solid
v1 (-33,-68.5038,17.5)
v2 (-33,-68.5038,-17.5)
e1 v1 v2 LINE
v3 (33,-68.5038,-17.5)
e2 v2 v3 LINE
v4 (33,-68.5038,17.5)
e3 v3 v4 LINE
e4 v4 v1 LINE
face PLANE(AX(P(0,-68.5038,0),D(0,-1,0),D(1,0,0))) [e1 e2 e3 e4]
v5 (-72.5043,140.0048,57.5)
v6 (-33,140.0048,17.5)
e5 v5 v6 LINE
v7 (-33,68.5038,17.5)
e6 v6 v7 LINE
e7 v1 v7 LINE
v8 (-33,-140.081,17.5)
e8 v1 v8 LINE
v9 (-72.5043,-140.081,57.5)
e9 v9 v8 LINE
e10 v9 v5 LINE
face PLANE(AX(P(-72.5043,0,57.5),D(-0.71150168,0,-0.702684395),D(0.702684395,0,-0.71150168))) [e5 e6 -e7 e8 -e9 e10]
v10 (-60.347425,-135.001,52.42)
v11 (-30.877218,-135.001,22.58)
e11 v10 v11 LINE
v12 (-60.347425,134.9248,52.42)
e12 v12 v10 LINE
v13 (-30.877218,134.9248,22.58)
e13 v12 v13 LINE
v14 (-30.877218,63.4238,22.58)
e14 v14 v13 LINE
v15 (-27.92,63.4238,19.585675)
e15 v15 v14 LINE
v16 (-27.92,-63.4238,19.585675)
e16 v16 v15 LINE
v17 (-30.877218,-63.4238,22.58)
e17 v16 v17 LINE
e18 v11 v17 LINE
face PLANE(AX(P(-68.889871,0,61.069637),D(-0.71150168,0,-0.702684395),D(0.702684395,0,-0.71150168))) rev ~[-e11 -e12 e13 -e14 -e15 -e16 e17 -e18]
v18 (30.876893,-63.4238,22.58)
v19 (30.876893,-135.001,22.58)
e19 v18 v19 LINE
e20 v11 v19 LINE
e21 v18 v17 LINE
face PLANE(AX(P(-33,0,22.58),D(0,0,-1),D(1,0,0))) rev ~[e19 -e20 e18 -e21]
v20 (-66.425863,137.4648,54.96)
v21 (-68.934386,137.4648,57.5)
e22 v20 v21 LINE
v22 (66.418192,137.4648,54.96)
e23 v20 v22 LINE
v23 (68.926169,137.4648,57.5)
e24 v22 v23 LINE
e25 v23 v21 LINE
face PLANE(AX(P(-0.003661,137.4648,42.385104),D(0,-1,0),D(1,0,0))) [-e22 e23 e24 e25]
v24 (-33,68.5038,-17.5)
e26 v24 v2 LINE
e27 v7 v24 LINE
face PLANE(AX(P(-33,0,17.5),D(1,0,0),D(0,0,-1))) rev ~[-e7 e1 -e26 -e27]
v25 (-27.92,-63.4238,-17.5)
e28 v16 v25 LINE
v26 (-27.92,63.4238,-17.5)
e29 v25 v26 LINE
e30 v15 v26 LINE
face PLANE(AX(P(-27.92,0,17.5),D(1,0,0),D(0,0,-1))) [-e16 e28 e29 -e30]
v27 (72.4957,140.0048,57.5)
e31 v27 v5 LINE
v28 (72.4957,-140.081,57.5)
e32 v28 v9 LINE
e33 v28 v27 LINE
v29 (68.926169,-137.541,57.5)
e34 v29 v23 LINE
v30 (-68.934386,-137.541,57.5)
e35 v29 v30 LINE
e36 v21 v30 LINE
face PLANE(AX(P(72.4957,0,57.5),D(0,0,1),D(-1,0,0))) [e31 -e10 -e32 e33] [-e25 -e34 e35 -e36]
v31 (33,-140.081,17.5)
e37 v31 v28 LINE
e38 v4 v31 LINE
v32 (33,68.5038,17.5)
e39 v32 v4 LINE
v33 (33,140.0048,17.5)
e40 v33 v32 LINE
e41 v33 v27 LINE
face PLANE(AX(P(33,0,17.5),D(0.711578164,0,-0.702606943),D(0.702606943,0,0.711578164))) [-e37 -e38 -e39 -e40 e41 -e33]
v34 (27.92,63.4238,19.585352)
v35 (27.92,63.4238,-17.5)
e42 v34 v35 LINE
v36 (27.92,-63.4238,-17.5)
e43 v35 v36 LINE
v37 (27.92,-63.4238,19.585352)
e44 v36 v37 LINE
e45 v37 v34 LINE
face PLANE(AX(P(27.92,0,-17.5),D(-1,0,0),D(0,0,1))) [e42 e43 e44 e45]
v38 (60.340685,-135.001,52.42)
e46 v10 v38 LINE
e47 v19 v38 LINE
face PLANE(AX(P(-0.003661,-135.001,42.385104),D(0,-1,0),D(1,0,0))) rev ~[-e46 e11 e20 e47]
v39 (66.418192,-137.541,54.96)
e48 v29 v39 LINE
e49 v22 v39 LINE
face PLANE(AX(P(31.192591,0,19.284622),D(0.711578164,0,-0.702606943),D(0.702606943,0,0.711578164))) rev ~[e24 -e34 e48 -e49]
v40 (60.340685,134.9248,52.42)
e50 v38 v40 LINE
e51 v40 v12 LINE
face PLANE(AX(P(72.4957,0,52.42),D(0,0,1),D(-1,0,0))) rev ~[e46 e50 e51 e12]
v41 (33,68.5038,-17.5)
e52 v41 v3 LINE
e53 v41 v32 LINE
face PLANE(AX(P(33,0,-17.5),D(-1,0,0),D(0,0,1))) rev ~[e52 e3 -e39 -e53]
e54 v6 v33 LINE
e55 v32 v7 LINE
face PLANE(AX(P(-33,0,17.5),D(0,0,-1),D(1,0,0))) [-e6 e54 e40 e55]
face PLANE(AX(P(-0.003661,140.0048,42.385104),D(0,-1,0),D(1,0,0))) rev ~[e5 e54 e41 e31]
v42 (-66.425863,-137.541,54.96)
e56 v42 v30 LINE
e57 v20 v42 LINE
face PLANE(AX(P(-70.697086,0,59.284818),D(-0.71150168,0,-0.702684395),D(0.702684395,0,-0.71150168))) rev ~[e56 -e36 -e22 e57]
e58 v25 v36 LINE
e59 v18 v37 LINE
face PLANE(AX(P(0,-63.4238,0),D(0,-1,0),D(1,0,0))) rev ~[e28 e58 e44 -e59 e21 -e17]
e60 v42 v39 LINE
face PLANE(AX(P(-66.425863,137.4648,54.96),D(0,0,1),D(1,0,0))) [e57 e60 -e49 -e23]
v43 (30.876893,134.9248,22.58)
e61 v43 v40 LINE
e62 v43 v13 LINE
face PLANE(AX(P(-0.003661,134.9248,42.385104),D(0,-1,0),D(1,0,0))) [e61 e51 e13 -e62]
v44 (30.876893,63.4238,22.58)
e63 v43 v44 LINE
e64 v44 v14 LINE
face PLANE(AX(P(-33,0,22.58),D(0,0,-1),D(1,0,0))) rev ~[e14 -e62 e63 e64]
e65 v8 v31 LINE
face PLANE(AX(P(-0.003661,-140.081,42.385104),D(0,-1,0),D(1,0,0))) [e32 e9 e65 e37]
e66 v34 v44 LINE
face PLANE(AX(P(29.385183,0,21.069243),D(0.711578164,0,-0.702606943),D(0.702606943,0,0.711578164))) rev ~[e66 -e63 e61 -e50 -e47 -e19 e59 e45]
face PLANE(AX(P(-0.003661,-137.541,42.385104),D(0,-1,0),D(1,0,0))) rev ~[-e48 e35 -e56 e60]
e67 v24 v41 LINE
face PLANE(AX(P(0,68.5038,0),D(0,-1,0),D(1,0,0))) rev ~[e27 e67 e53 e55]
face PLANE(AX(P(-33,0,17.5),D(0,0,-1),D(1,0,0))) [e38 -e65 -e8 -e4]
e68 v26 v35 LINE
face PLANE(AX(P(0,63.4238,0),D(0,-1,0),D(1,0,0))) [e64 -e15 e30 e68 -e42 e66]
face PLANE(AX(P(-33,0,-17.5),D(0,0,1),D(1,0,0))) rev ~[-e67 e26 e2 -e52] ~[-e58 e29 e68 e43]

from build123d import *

# Parameters (mm, degrees)
F1_DEPTH     = 140.081
F2_DEPTH     = 140.0048
F3_DEPTH     = 68.5038
F4_DEPTH     = 68.5038
F5_T         = -5.08
F6_T         = 2.54
F6_T3_DEPTH  = 142.0876
F6_T5_DEPTH  = 71.08
F6_T7_DEPTH  = 275.0058
F6_T9_DEPTH  = 47.0194652776
F6_T11_DEPTH = 76.581
F6_T13_DEPTH = 9.2884577092
F6_T15_DEPTH = 76.6572
F6_T17_DEPTH = 125.7681103512
F6_T19_DEPTH = 47.0149573841
F6_T21_DEPTH = 66.8341103512
F6_T23_DEPTH = 47.0149573841
F6_T25_DEPTH = 9.2884593969
F6_T27_DEPTH = 42.1653521873
F6_T29_DEPTH = 42.16567527


# Not quite as in the source:
# - a shell that OpenCascade refuses in one call is made with other operations: the cavity is built on its own and cut out


with BuildPart() as f1:
    # F0 (on Front) → F1 (new body)
    with BuildSketch(Plane.XZ):
        Polygon((-72.5043, 57.5), (-33, 17.5), (0, 17.5), (33, 17.5), (72.4957, 57.5), align=None)
    extrude(amount=F1_DEPTH)

    # F0 (on Front) → F2 (join)
    with BuildSketch(Plane.XZ):
        Polygon((-72.5043, 57.5), (-33, 17.5), (0, 17.5), (33, 17.5), (72.4957, 57.5), align=None)
    extrude(amount=-F2_DEPTH)

    # F0 (on Front) → F3 (join)
    with BuildSketch(Plane.XZ):
        Polygon((-33, 17.5), (-33, -17.5), (33, -17.5), (33, 17.5), (0, 17.5), align=None)
    extrude(amount=-F3_DEPTH)

    # F0 (on Front) → F4 (join)
    with BuildSketch(Plane.XZ):
        Polygon((-33, 17.5), (-33, -17.5), (33, -17.5), (33, 17.5), (0, 17.5), align=None)
    extrude(amount=F4_DEPTH)

    # F5
    f5_openings = [f1.faces().sort_by_distance(p)[0] for p in [
        (0, 0, -17.5),
    ]]
    offset(amount=F5_T, openings=f5_openings, kind=Kind.INTERSECTION)

    # F6: shell of thickness 2.54, made by hand


with BuildPart() as f6_core1:
    # F6_t2: copy of F1
    add(f1.part)

    # the walls: a layer under each face that stays
    f6_faces = [f6_core1.faces().sort_by_distance(p)[0] for p in [
        (-52.75215, -0.0381, 37.5),
        (-0.0043, 140.0048, 37.5),
        (52.74785, -0.0381, 37.5),
        (33, 0, 0),
        (0, -68.5038, 0),
        (0, 68.5038, 0),
        (0, 104.2543, 17.5),
        (-33, 0, 0),
        (0, -104.2924, 17.5),
        (-0.0043, -140.081, 37.5),
        (-28.2857142857, 58.7175428571, -17.5),
        (-44.1337126804, -0.0381, 36.002837635),
        (-0.0033701852, 134.9248, 37.5),
        (44.1303424952, -0.0381, 36.0026760937),
        (27.92, 0, 1.0426760937),
        (28.4128154651, -63.4238, 21.0826760937),
        (0, -63.4238, 2.54),
        (-29.3986087804, -63.4238, 22.0809458783),
        (28.4128154651, 63.4238, 21.0826760937),
        (0, 63.4238, 2.54),
        (-29.3986087804, 63.4238, 22.0809458783),
        (-0.0001623852, 99.1743, 22.58),
        (-27.92, 0, 1.042837635),
        (-0.0001623852, -99.2124, 22.58),
        (-0.0033701852, -135.001, 37.5),
        (-0.0033701852, -0.0381, 52.42),
    ]]
    thicken(f6_faces, amount=-F6_T, mode=Mode.SUBTRACT)

    # F6_s4 → F6_t3 (cut)
    with BuildSketch(Plane.XZ.offset(-71.0438)):
        Polygon((-33.0434721427, 17.4821518164), (-31.192785733, 19.2848183642), (-30.46, 18.542837635), (-30.46, 17.5), align=None)
        Polygon((33.0434740854, 17.4821537837), (31.1925914624, 19.2846216345), (30.46, 18.5426760937), (30.46, 17.5), align=None)
    extrude(amount=F6_T3_DEPTH, mode=Mode.SUBTRACT)

    # F6_s6 → F6_t5 (cut)
    with BuildSketch(Plane.YZ.offset(-35.54)):
        Polygon((-68.5292, 17.4746), (-65.9638, 17.5), (-65.9638, 20.04), (-68.5038, 20.04), align=None)
        Polygon((68.5292, 17.4746), (65.9638, 17.5), (65.9638, 20.04), (68.5038, 20.04), align=None)
    extrude(amount=F6_T5_DEPTH, mode=Mode.SUBTRACT)

    # F6_s8 → F6_t7 (cut)
    with BuildSketch(Plane.XZ.offset(-137.4648)):
        Polygon((-60.3293532181, 52.4124481836), (-62.1546396278, 50.6351816358), (-66.4258626804, 54.96), (-60.3474253608, 54.96), align=None)
        Polygon((60.322610905, 52.4124462163), (62.148093528, 50.6353783655), (66.4181924952, 54.96), (60.3406849904, 54.96), align=None)
    extrude(amount=F6_T7_DEPTH, mode=Mode.SUBTRACT)

    # F6_s10 → F6_t9 (cut)
    with BuildSketch(Plane(origin=(-57.7902488571, 0, 58.5154009635), x_dir=(0, 1, 0), z_dir=(0.7026843954, 0, -0.7115016799))):
        Polygon((134.8994, -6.0771785187), (134.9248, -8.6425785187), (137.4648, -8.6425785187), (137.4648, -6.1025785187), align=None)
        Polygon((-134.9756, -6.0771785187), (-135.001, -8.6425785187), (-137.541, -8.6425785187), (-137.541, -6.1025785187), align=None)
    extrude(amount=F6_T9_DEPTH, mode=Mode.SUBTRACT)

    # F6_s12 → F6_t11 (cut)
    with BuildSketch(Plane.XZ.offset(-137.4648)):
        Polygon((-30.8591454181, 22.6232481836), (-32.6844318278, 20.7951816358), (-31.9386087804, 20.04), (-30.8772175608, 20.04), align=None)
        Polygon((30.858818705, 22.6232462163), (32.684301328, 20.7953783655), (31.9384463952, 20.04), (30.8768927904, 20.04), align=None)
    extrude(amount=F6_T11_DEPTH, mode=Mode.SUBTRACT)

    # F6_s14 → F6_t13 (cut)
    with BuildSketch(Plane(origin=(-28.3200410571, 0, 28.6754009635), x_dir=(0, 1, 0), z_dir=(0.7026843954, 0, -0.7115016799))):
        Polygon((63.3984, -6.0771785187), (63.4238, -8.6425785187), (65.9638, -8.6425785187), (65.9638, -6.1025785187), align=None)
        Polygon((-63.3984, -6.0771785187), (-63.4238, -8.6425785187), (-65.9638, -8.6425785187), (-65.9638, -6.1025785187), align=None)
    extrude(amount=F6_T13_DEPTH, mode=Mode.SUBTRACT)

    # F6_s16 → F6_t15 (cut)
    with BuildSketch(Plane.XZ.offset(60.8838)):
        Polygon((-30.8591454181, 22.6232481836), (-32.6844318278, 20.7951816358), (-31.9386087804, 20.04), (-30.8772175608, 20.04), align=None)
        Polygon((30.858818705, 22.6232462163), (32.684301328, 20.7953783655), (31.9384463952, 20.04), (30.8768927904, 20.04), align=None)
    extrude(amount=F6_T15_DEPTH, mode=Mode.SUBTRACT)

    # F6_s18 → F6_t17 (cut)
    with BuildSketch(Plane.YZ.offset(-62.8874253608)):
        Polygon((134.8994, 52.3946), (137.4648, 52.42), (137.4648, 54.96), (134.9248, 54.96), align=None)
        Polygon((-134.9756, 52.3946), (-137.541, 52.42), (-137.541, 54.96), (-135.001, 54.96), align=None)
    extrude(amount=F6_T17_DEPTH, mode=Mode.SUBTRACT)

    # F6_s20 → F6_t19 (cut)
    with BuildSketch(Plane(origin=(57.7800845012, 0, 58.5178482733), x_dir=(0, 1, 0), z_dir=(-0.7026069427, 0, -0.7115781644))):
        Polygon((134.8994, 6.0810579283), (137.4648, 6.1064579283), (137.4648, 8.6464579283), (134.9248, 8.6464579283), align=None)
    extrude(amount=F6_T19_DEPTH, mode=Mode.SUBTRACT)

    # F6_s22 → F6_t21 (cut)
    with BuildSketch(Plane.YZ.offset(-33.4172175608)):
        Polygon((134.8994, 22.6054), (137.4648, 22.58), (137.4648, 20.04), (134.9248, 20.04), align=None)
        Polygon((-134.9756, 22.6054), (-135.001, 20.04), (-137.541, 20.04), (-137.541, 22.58), align=None)
    extrude(amount=F6_T21_DEPTH, mode=Mode.SUBTRACT)

    # F6_s24 → F6_t23 (cut)
    with BuildSketch(Plane(origin=(24.7470490323, 0, 25.0630311981), x_dir=(0, 1, 0), z_dir=(0.7026069427, 0, 0.7115781644))):
        Polygon((-134.9756, -6.0810579283), (-135.001, -8.6464579283), (-137.541, -8.6464579283), (-137.541, -6.1064579283), align=None)
    extrude(amount=F6_T23_DEPTH, mode=Mode.SUBTRACT)

    # F6_s26 → F6_t25 (cut)
    with BuildSketch(Plane(origin=(21.7901562419, 0, 22.0683833854), x_dir=(0, 1, 0), z_dir=(0.7026069427, 0, 0.7115781644))):
        Polygon((-63.3984, -6.0810579283), (-63.4238, -8.6464579283), (-65.9638, -8.6464579283), (-65.9638, -6.1064579283), align=None)
        Polygon((63.3984, -6.0810579283), (63.4238, -8.6464579283), (65.9638, -8.6464579283), (65.9638, -6.1064579283), align=None)
    extrude(amount=F6_T25_DEPTH, mode=Mode.SUBTRACT)

    # F6_s28 → F6_t27 (cut)
    with BuildSketch(Plane.XY.offset(-20.04)):
        Polygon((27.8946, 63.3984), (30.46, 63.4238), (30.46, 65.9638), (27.92, 65.9638), align=None)
        Polygon((27.8946, -63.3984), (30.46, -63.4238), (30.46, -65.9638), (27.92, -65.9638), align=None)
    extrude(amount=F6_T27_DEPTH, mode=Mode.SUBTRACT)

    # F6_s30 → F6_t29 (cut)
    with BuildSketch(Plane.XY.offset(-20.04)):
        Polygon((-27.8946, -63.3984), (-27.92, -65.9638), (-30.46, -65.9638), (-30.46, -63.4238), align=None)
        Polygon((-27.8946, 63.3984), (-27.92, 65.9638), (-30.46, 65.9638), (-30.46, 63.4238), align=None)
    extrude(amount=F6_T29_DEPTH, mode=Mode.SUBTRACT)


with BuildPart() as f1_1:
    add(f1.part)

    # what is left inside the walls is the cavity
    f6_cavity = [f6_core1.part.solids().sort_by_distance(p)[0] for p in [
        (-0.004108, -45.8724, 57.4746),
    ]]
    add(f6_cavity, mode=Mode.SUBTRACT)


solid = f1_1.part
